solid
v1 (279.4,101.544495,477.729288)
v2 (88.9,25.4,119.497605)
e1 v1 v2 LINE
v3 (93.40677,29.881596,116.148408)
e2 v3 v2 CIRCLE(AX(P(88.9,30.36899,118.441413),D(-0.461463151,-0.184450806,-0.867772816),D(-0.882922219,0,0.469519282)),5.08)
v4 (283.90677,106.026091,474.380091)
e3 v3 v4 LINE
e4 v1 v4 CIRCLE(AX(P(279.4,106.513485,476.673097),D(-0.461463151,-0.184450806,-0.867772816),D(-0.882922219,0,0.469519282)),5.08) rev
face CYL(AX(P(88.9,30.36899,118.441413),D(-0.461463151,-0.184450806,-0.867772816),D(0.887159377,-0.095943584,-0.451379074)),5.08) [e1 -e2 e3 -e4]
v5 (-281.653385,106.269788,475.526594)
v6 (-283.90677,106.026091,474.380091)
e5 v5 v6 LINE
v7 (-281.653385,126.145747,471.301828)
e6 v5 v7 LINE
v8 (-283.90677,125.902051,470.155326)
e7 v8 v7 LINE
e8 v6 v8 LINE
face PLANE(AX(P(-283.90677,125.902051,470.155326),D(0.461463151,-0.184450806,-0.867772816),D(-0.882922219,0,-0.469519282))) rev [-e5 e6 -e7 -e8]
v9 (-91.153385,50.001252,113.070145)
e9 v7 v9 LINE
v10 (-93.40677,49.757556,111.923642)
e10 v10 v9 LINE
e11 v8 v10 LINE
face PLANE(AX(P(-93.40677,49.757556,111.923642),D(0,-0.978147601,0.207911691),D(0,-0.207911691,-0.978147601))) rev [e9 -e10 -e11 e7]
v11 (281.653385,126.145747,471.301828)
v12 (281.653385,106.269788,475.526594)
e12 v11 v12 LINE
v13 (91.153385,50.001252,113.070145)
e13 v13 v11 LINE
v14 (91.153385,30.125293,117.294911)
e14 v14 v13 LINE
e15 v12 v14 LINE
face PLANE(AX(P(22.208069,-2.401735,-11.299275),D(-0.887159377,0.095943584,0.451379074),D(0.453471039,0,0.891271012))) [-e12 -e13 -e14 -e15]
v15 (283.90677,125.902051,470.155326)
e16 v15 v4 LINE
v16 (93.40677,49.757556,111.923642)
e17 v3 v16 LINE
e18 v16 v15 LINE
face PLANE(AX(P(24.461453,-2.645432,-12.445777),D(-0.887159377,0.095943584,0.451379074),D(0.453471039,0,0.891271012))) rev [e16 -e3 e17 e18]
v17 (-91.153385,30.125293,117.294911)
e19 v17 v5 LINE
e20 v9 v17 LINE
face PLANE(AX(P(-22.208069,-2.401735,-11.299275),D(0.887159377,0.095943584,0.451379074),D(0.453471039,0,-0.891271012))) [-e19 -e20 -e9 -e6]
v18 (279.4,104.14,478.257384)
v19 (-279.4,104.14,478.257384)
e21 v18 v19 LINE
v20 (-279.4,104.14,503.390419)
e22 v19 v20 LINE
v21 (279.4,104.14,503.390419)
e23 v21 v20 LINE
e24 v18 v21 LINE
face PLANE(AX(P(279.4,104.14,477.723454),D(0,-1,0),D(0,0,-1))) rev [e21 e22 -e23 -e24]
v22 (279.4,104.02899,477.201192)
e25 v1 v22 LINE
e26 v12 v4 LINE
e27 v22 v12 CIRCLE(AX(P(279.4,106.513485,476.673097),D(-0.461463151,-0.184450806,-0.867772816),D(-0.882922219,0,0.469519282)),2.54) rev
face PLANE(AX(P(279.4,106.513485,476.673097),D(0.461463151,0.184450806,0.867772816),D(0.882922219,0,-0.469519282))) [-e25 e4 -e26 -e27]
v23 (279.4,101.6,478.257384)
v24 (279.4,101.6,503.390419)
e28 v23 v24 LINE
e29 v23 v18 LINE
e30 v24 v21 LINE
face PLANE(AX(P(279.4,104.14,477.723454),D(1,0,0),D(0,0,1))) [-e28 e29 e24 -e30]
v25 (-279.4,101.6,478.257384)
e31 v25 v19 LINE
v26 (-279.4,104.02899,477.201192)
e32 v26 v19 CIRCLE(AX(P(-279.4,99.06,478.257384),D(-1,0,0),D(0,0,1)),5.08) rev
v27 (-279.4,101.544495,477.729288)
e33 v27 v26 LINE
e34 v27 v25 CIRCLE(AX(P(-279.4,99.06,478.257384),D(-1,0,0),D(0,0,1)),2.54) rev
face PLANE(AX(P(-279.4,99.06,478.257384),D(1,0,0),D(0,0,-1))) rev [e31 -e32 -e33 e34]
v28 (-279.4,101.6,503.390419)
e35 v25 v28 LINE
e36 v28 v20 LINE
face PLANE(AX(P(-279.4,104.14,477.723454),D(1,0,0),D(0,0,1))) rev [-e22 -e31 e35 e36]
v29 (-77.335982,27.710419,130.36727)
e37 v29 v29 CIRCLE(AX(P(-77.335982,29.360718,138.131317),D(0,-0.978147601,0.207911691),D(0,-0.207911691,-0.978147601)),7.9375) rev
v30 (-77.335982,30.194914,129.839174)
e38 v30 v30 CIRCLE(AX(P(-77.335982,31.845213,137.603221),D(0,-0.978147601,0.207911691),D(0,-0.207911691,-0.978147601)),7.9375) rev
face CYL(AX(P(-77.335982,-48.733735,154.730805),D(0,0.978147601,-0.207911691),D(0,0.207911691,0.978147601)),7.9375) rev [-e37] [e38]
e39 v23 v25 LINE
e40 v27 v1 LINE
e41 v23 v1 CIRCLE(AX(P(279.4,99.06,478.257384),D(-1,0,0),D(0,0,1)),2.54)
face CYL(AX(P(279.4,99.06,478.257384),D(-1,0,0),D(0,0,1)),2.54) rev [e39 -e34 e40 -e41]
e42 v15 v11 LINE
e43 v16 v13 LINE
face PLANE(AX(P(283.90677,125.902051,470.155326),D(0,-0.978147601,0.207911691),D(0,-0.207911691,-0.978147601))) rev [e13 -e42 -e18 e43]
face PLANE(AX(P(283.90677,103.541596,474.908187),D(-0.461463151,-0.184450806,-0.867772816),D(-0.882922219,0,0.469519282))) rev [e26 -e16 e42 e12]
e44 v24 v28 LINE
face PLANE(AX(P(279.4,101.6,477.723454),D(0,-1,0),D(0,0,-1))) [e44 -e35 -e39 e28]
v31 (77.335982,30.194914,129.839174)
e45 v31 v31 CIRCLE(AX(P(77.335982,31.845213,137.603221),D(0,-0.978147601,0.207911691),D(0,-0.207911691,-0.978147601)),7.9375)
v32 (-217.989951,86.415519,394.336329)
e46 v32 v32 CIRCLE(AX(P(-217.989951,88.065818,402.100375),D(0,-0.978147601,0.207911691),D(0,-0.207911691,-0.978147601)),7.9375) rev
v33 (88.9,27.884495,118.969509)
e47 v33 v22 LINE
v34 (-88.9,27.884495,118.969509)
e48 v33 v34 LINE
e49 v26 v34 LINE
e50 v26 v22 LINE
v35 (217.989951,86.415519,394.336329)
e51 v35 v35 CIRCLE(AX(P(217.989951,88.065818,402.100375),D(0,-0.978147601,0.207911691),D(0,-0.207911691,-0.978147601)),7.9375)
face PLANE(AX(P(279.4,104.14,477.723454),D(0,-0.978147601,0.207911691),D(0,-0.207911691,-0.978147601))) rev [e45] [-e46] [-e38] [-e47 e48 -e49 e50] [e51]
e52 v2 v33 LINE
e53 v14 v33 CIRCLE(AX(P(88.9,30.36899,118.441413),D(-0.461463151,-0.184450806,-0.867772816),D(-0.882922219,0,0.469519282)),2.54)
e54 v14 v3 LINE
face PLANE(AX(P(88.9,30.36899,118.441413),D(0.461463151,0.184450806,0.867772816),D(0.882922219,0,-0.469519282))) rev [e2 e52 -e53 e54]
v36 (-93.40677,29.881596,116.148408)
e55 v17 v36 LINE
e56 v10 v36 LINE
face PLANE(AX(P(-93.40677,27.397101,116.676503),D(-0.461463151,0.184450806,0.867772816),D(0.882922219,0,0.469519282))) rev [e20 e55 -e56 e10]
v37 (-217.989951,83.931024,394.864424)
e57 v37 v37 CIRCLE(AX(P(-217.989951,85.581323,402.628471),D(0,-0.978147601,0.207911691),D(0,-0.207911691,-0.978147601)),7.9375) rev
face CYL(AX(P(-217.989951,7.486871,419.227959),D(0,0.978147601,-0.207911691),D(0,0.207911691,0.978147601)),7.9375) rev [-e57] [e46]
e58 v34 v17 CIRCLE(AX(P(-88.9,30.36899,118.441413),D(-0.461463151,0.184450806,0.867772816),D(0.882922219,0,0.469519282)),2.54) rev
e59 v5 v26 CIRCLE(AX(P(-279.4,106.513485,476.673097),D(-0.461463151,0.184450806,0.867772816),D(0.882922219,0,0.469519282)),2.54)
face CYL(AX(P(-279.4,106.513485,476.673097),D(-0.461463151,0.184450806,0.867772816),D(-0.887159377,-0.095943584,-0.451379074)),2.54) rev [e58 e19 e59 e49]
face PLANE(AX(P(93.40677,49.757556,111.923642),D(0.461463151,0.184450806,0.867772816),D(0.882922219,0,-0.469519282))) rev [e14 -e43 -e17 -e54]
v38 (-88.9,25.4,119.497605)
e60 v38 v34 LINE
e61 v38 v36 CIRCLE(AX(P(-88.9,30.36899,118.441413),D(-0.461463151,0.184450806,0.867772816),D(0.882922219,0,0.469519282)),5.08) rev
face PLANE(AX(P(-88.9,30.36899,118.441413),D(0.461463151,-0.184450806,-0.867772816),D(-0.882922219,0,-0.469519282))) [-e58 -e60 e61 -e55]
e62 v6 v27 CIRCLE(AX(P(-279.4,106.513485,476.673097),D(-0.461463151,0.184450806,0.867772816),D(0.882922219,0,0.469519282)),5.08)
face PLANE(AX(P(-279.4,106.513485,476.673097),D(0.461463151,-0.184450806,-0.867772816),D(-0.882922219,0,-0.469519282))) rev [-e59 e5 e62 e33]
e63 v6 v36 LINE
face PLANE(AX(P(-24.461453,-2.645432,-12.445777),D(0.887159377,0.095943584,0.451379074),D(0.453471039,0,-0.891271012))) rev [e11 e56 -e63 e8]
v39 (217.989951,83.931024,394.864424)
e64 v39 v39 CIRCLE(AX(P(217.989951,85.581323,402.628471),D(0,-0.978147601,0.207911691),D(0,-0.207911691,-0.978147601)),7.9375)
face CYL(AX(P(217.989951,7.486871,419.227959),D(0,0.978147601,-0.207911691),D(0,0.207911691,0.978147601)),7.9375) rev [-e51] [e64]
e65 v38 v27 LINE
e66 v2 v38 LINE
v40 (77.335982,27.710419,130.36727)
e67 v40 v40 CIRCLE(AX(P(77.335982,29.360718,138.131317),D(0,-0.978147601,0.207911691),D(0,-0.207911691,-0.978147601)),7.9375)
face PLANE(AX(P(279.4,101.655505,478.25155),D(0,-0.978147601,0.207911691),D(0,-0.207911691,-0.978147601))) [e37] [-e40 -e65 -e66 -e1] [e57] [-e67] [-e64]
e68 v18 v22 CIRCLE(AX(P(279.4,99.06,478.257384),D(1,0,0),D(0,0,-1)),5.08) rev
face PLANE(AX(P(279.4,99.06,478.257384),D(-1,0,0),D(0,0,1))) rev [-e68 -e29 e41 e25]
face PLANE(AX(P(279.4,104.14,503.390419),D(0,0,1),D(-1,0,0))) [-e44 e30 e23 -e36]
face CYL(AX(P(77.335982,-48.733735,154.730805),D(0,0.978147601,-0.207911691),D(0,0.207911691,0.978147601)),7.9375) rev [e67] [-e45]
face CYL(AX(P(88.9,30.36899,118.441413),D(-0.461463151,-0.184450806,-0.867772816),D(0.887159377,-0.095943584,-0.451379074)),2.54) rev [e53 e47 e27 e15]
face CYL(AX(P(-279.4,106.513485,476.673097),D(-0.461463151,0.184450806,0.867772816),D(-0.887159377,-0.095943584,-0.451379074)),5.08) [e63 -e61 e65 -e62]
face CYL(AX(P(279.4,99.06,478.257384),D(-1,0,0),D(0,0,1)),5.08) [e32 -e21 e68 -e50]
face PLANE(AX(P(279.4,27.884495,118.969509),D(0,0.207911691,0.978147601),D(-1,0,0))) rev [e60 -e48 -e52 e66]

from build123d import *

# Parameters (mm, degrees)
BOSS_EXTRUDE1_DEPTH     = 279.4
CONVERT_SOLID1_START    = -279.4
CONVERT_SOLID1_DEPTH    = 558.8
CONVERT_SOLID1_2_DEPTH  = 558.8
CUT_EXTRUDE1_DEPTH      = 586.091506768
EDGE_FLANGE1_DEPTH      = 412.817360463
EDGE_FLANGE1_BEND_DEPTH = 412.817360463
SKETCH12_R              = 7.9375
CUT_EXTRUDE2_DEPTH      = 592.463463584


# Read off the part's stored shape, not the designer's step: Convert-Solid1
# Sheet-metal steps are written as plain solids
with BuildPart() as part:
    # Sketch3 → Boss-Extrude1 (new, symmetric)
    with BuildSketch(Plane(origin=(0, 0, 0), x_dir=(0, 0, -1), z_dir=(1, 0, 0))):
        Polygon((-477.990419123, 101.6), (-503.390419123, 101.6), (-503.390419123, 104.14), (-477.723454365, 104.14), (-118.969509086, 27.884494906), (-119.497604781, 25.4), align=None)
    extrude(amount=BOSS_EXTRUDE1_DEPTH, both=True)

    # Convert-Solid1 outline → Convert-Solid1 (cut)
    with BuildSketch(Plane.YZ.offset(CONVERT_SOLID1_START)):
        with BuildLine():
            Line((104.14, 477.723454365), (104.14, 478.257383881))
            ThreePointArc((104.14, 478.257383881), (104.112171228, 477.726379287), (104.028989812, 477.201192491))
            Line((104.028989812, 477.201192491), (104.14, 477.723454365))
        make_face()
    extrude(amount=CONVERT_SOLID1_DEPTH, mode=Mode.SUBTRACT)

    # Convert-Solid1 2 outline → Convert-Solid1 2 (add)
    with BuildSketch(Plane.YZ.offset(CONVERT_SOLID1_START)):
        with BuildLine():
            Line((101.6, 477.990419123), (101.6, 478.257383881))
            ThreePointArc((101.6, 478.257383881), (101.586085614, 477.991881584), (101.544494906, 477.729288186))
            Line((101.544494906, 477.729288186), (101.6, 477.990419123))
        make_face()
    extrude(amount=CONVERT_SOLID1_2_DEPTH)

    # Sketch8 → Cut-Extrude1 (cut, through all)
    with BuildSketch(Plane(origin=(0, 2.484494906, -0.528095695), x_dir=(1, 0, 0), z_dir=(0, 0.978147600733807, -0.20791169081775257))):
        Polygon((279.4, -488.402044668), (88.9, -122.167252357), (279.4, -122.167252357), align=None)
        Polygon((-88.9, -122.167252357), (-279.4, -488.402044668), (-279.4, -122.167252357), align=None)
    extrude(amount=-CUT_EXTRUDE1_DEPTH, mode=Mode.SUBTRACT)

    # Edge-Flange1 section (across the edge) → Edge-Flange1 (add)
    with BuildSketch(Plane(origin=(281.653384818, 103.785293108, 476.054689643), x_dir=(-0.8871593769725215, 0.09594358400128161, 0.4513790741037036), z_dir=(-0.46146315112880654, -0.18445080609118086, -0.8677728160541711))):
        with BuildLine():
            Line((-2.54, 2.54), (-2.54, 22.86))
            Line((-2.54, 22.86), (0, 22.86))
            Line((0, 22.86), (0, 2.54))
            ThreePointArc((0, 2.54), (0.743948776, 0.743948776), (2.54, 0))
            Line((2.54, 0), (2.54, -2.54))
            ThreePointArc((2.54, -2.54), (-1.052102448, -1.052102448), (-2.54, 2.54))
        make_face()
    extrude(amount=EDGE_FLANGE1_DEPTH)

    # Edge-Flange1 section 2 (across the edge) → Edge-Flange1 bend (add)
    with BuildSketch(Plane(origin=(-91.153384818, 27.640798203, 117.823006238), x_dir=(0.8871593769725281, 0.09594358400127896, 0.4513790741036911), z_dir=(-0.46146315112879377, 0.18445080609118228, 0.8677728160541774))):
        with BuildLine():
            Line((-2.54, 2.54), (-2.54, 22.86))
            Line((-2.54, 22.86), (0, 22.86))
            Line((0, 22.86), (0, 2.54))
            ThreePointArc((0, 2.54), (0.743948776, 0.743948776), (2.54, 0))
            Line((2.54, 0), (2.54, -2.54))
            ThreePointArc((2.54, -2.54), (-1.052102448, -1.052102448), (-2.54, 2.54))
        make_face()
    extrude(amount=EDGE_FLANGE1_BEND_DEPTH)

    # Sketch12 → Cut-Extrude2 (cut, symmetric)
    with BuildSketch(Plane(origin=(0, 2.484494906, -0.528095695), x_dir=(1, 0, 0), z_dir=(0, 0.9781476007338071, -0.2079116908177526))):
        with Locations(Location((217.989950501, -411.623430458, 0), (0, 0, 90))):
            Circle(SKETCH12_R)
        with Locations(Location((77.335982037, -141.217252357, 0), (0, 0, 90))):
            Circle(SKETCH12_R)
    cut_extrude2 = extrude(amount=CUT_EXTRUDE2_DEPTH, both=True, mode=Mode.SUBTRACT)

    # Mirror8: Cut-Extrude2 across plane
    add(cut_extrude2.mirror(Plane(origin=(0, 0, 0), x_dir=(0, 0, 1), z_dir=(1, 0, 0))), mode=Mode.SUBTRACT)


solid = part.part
